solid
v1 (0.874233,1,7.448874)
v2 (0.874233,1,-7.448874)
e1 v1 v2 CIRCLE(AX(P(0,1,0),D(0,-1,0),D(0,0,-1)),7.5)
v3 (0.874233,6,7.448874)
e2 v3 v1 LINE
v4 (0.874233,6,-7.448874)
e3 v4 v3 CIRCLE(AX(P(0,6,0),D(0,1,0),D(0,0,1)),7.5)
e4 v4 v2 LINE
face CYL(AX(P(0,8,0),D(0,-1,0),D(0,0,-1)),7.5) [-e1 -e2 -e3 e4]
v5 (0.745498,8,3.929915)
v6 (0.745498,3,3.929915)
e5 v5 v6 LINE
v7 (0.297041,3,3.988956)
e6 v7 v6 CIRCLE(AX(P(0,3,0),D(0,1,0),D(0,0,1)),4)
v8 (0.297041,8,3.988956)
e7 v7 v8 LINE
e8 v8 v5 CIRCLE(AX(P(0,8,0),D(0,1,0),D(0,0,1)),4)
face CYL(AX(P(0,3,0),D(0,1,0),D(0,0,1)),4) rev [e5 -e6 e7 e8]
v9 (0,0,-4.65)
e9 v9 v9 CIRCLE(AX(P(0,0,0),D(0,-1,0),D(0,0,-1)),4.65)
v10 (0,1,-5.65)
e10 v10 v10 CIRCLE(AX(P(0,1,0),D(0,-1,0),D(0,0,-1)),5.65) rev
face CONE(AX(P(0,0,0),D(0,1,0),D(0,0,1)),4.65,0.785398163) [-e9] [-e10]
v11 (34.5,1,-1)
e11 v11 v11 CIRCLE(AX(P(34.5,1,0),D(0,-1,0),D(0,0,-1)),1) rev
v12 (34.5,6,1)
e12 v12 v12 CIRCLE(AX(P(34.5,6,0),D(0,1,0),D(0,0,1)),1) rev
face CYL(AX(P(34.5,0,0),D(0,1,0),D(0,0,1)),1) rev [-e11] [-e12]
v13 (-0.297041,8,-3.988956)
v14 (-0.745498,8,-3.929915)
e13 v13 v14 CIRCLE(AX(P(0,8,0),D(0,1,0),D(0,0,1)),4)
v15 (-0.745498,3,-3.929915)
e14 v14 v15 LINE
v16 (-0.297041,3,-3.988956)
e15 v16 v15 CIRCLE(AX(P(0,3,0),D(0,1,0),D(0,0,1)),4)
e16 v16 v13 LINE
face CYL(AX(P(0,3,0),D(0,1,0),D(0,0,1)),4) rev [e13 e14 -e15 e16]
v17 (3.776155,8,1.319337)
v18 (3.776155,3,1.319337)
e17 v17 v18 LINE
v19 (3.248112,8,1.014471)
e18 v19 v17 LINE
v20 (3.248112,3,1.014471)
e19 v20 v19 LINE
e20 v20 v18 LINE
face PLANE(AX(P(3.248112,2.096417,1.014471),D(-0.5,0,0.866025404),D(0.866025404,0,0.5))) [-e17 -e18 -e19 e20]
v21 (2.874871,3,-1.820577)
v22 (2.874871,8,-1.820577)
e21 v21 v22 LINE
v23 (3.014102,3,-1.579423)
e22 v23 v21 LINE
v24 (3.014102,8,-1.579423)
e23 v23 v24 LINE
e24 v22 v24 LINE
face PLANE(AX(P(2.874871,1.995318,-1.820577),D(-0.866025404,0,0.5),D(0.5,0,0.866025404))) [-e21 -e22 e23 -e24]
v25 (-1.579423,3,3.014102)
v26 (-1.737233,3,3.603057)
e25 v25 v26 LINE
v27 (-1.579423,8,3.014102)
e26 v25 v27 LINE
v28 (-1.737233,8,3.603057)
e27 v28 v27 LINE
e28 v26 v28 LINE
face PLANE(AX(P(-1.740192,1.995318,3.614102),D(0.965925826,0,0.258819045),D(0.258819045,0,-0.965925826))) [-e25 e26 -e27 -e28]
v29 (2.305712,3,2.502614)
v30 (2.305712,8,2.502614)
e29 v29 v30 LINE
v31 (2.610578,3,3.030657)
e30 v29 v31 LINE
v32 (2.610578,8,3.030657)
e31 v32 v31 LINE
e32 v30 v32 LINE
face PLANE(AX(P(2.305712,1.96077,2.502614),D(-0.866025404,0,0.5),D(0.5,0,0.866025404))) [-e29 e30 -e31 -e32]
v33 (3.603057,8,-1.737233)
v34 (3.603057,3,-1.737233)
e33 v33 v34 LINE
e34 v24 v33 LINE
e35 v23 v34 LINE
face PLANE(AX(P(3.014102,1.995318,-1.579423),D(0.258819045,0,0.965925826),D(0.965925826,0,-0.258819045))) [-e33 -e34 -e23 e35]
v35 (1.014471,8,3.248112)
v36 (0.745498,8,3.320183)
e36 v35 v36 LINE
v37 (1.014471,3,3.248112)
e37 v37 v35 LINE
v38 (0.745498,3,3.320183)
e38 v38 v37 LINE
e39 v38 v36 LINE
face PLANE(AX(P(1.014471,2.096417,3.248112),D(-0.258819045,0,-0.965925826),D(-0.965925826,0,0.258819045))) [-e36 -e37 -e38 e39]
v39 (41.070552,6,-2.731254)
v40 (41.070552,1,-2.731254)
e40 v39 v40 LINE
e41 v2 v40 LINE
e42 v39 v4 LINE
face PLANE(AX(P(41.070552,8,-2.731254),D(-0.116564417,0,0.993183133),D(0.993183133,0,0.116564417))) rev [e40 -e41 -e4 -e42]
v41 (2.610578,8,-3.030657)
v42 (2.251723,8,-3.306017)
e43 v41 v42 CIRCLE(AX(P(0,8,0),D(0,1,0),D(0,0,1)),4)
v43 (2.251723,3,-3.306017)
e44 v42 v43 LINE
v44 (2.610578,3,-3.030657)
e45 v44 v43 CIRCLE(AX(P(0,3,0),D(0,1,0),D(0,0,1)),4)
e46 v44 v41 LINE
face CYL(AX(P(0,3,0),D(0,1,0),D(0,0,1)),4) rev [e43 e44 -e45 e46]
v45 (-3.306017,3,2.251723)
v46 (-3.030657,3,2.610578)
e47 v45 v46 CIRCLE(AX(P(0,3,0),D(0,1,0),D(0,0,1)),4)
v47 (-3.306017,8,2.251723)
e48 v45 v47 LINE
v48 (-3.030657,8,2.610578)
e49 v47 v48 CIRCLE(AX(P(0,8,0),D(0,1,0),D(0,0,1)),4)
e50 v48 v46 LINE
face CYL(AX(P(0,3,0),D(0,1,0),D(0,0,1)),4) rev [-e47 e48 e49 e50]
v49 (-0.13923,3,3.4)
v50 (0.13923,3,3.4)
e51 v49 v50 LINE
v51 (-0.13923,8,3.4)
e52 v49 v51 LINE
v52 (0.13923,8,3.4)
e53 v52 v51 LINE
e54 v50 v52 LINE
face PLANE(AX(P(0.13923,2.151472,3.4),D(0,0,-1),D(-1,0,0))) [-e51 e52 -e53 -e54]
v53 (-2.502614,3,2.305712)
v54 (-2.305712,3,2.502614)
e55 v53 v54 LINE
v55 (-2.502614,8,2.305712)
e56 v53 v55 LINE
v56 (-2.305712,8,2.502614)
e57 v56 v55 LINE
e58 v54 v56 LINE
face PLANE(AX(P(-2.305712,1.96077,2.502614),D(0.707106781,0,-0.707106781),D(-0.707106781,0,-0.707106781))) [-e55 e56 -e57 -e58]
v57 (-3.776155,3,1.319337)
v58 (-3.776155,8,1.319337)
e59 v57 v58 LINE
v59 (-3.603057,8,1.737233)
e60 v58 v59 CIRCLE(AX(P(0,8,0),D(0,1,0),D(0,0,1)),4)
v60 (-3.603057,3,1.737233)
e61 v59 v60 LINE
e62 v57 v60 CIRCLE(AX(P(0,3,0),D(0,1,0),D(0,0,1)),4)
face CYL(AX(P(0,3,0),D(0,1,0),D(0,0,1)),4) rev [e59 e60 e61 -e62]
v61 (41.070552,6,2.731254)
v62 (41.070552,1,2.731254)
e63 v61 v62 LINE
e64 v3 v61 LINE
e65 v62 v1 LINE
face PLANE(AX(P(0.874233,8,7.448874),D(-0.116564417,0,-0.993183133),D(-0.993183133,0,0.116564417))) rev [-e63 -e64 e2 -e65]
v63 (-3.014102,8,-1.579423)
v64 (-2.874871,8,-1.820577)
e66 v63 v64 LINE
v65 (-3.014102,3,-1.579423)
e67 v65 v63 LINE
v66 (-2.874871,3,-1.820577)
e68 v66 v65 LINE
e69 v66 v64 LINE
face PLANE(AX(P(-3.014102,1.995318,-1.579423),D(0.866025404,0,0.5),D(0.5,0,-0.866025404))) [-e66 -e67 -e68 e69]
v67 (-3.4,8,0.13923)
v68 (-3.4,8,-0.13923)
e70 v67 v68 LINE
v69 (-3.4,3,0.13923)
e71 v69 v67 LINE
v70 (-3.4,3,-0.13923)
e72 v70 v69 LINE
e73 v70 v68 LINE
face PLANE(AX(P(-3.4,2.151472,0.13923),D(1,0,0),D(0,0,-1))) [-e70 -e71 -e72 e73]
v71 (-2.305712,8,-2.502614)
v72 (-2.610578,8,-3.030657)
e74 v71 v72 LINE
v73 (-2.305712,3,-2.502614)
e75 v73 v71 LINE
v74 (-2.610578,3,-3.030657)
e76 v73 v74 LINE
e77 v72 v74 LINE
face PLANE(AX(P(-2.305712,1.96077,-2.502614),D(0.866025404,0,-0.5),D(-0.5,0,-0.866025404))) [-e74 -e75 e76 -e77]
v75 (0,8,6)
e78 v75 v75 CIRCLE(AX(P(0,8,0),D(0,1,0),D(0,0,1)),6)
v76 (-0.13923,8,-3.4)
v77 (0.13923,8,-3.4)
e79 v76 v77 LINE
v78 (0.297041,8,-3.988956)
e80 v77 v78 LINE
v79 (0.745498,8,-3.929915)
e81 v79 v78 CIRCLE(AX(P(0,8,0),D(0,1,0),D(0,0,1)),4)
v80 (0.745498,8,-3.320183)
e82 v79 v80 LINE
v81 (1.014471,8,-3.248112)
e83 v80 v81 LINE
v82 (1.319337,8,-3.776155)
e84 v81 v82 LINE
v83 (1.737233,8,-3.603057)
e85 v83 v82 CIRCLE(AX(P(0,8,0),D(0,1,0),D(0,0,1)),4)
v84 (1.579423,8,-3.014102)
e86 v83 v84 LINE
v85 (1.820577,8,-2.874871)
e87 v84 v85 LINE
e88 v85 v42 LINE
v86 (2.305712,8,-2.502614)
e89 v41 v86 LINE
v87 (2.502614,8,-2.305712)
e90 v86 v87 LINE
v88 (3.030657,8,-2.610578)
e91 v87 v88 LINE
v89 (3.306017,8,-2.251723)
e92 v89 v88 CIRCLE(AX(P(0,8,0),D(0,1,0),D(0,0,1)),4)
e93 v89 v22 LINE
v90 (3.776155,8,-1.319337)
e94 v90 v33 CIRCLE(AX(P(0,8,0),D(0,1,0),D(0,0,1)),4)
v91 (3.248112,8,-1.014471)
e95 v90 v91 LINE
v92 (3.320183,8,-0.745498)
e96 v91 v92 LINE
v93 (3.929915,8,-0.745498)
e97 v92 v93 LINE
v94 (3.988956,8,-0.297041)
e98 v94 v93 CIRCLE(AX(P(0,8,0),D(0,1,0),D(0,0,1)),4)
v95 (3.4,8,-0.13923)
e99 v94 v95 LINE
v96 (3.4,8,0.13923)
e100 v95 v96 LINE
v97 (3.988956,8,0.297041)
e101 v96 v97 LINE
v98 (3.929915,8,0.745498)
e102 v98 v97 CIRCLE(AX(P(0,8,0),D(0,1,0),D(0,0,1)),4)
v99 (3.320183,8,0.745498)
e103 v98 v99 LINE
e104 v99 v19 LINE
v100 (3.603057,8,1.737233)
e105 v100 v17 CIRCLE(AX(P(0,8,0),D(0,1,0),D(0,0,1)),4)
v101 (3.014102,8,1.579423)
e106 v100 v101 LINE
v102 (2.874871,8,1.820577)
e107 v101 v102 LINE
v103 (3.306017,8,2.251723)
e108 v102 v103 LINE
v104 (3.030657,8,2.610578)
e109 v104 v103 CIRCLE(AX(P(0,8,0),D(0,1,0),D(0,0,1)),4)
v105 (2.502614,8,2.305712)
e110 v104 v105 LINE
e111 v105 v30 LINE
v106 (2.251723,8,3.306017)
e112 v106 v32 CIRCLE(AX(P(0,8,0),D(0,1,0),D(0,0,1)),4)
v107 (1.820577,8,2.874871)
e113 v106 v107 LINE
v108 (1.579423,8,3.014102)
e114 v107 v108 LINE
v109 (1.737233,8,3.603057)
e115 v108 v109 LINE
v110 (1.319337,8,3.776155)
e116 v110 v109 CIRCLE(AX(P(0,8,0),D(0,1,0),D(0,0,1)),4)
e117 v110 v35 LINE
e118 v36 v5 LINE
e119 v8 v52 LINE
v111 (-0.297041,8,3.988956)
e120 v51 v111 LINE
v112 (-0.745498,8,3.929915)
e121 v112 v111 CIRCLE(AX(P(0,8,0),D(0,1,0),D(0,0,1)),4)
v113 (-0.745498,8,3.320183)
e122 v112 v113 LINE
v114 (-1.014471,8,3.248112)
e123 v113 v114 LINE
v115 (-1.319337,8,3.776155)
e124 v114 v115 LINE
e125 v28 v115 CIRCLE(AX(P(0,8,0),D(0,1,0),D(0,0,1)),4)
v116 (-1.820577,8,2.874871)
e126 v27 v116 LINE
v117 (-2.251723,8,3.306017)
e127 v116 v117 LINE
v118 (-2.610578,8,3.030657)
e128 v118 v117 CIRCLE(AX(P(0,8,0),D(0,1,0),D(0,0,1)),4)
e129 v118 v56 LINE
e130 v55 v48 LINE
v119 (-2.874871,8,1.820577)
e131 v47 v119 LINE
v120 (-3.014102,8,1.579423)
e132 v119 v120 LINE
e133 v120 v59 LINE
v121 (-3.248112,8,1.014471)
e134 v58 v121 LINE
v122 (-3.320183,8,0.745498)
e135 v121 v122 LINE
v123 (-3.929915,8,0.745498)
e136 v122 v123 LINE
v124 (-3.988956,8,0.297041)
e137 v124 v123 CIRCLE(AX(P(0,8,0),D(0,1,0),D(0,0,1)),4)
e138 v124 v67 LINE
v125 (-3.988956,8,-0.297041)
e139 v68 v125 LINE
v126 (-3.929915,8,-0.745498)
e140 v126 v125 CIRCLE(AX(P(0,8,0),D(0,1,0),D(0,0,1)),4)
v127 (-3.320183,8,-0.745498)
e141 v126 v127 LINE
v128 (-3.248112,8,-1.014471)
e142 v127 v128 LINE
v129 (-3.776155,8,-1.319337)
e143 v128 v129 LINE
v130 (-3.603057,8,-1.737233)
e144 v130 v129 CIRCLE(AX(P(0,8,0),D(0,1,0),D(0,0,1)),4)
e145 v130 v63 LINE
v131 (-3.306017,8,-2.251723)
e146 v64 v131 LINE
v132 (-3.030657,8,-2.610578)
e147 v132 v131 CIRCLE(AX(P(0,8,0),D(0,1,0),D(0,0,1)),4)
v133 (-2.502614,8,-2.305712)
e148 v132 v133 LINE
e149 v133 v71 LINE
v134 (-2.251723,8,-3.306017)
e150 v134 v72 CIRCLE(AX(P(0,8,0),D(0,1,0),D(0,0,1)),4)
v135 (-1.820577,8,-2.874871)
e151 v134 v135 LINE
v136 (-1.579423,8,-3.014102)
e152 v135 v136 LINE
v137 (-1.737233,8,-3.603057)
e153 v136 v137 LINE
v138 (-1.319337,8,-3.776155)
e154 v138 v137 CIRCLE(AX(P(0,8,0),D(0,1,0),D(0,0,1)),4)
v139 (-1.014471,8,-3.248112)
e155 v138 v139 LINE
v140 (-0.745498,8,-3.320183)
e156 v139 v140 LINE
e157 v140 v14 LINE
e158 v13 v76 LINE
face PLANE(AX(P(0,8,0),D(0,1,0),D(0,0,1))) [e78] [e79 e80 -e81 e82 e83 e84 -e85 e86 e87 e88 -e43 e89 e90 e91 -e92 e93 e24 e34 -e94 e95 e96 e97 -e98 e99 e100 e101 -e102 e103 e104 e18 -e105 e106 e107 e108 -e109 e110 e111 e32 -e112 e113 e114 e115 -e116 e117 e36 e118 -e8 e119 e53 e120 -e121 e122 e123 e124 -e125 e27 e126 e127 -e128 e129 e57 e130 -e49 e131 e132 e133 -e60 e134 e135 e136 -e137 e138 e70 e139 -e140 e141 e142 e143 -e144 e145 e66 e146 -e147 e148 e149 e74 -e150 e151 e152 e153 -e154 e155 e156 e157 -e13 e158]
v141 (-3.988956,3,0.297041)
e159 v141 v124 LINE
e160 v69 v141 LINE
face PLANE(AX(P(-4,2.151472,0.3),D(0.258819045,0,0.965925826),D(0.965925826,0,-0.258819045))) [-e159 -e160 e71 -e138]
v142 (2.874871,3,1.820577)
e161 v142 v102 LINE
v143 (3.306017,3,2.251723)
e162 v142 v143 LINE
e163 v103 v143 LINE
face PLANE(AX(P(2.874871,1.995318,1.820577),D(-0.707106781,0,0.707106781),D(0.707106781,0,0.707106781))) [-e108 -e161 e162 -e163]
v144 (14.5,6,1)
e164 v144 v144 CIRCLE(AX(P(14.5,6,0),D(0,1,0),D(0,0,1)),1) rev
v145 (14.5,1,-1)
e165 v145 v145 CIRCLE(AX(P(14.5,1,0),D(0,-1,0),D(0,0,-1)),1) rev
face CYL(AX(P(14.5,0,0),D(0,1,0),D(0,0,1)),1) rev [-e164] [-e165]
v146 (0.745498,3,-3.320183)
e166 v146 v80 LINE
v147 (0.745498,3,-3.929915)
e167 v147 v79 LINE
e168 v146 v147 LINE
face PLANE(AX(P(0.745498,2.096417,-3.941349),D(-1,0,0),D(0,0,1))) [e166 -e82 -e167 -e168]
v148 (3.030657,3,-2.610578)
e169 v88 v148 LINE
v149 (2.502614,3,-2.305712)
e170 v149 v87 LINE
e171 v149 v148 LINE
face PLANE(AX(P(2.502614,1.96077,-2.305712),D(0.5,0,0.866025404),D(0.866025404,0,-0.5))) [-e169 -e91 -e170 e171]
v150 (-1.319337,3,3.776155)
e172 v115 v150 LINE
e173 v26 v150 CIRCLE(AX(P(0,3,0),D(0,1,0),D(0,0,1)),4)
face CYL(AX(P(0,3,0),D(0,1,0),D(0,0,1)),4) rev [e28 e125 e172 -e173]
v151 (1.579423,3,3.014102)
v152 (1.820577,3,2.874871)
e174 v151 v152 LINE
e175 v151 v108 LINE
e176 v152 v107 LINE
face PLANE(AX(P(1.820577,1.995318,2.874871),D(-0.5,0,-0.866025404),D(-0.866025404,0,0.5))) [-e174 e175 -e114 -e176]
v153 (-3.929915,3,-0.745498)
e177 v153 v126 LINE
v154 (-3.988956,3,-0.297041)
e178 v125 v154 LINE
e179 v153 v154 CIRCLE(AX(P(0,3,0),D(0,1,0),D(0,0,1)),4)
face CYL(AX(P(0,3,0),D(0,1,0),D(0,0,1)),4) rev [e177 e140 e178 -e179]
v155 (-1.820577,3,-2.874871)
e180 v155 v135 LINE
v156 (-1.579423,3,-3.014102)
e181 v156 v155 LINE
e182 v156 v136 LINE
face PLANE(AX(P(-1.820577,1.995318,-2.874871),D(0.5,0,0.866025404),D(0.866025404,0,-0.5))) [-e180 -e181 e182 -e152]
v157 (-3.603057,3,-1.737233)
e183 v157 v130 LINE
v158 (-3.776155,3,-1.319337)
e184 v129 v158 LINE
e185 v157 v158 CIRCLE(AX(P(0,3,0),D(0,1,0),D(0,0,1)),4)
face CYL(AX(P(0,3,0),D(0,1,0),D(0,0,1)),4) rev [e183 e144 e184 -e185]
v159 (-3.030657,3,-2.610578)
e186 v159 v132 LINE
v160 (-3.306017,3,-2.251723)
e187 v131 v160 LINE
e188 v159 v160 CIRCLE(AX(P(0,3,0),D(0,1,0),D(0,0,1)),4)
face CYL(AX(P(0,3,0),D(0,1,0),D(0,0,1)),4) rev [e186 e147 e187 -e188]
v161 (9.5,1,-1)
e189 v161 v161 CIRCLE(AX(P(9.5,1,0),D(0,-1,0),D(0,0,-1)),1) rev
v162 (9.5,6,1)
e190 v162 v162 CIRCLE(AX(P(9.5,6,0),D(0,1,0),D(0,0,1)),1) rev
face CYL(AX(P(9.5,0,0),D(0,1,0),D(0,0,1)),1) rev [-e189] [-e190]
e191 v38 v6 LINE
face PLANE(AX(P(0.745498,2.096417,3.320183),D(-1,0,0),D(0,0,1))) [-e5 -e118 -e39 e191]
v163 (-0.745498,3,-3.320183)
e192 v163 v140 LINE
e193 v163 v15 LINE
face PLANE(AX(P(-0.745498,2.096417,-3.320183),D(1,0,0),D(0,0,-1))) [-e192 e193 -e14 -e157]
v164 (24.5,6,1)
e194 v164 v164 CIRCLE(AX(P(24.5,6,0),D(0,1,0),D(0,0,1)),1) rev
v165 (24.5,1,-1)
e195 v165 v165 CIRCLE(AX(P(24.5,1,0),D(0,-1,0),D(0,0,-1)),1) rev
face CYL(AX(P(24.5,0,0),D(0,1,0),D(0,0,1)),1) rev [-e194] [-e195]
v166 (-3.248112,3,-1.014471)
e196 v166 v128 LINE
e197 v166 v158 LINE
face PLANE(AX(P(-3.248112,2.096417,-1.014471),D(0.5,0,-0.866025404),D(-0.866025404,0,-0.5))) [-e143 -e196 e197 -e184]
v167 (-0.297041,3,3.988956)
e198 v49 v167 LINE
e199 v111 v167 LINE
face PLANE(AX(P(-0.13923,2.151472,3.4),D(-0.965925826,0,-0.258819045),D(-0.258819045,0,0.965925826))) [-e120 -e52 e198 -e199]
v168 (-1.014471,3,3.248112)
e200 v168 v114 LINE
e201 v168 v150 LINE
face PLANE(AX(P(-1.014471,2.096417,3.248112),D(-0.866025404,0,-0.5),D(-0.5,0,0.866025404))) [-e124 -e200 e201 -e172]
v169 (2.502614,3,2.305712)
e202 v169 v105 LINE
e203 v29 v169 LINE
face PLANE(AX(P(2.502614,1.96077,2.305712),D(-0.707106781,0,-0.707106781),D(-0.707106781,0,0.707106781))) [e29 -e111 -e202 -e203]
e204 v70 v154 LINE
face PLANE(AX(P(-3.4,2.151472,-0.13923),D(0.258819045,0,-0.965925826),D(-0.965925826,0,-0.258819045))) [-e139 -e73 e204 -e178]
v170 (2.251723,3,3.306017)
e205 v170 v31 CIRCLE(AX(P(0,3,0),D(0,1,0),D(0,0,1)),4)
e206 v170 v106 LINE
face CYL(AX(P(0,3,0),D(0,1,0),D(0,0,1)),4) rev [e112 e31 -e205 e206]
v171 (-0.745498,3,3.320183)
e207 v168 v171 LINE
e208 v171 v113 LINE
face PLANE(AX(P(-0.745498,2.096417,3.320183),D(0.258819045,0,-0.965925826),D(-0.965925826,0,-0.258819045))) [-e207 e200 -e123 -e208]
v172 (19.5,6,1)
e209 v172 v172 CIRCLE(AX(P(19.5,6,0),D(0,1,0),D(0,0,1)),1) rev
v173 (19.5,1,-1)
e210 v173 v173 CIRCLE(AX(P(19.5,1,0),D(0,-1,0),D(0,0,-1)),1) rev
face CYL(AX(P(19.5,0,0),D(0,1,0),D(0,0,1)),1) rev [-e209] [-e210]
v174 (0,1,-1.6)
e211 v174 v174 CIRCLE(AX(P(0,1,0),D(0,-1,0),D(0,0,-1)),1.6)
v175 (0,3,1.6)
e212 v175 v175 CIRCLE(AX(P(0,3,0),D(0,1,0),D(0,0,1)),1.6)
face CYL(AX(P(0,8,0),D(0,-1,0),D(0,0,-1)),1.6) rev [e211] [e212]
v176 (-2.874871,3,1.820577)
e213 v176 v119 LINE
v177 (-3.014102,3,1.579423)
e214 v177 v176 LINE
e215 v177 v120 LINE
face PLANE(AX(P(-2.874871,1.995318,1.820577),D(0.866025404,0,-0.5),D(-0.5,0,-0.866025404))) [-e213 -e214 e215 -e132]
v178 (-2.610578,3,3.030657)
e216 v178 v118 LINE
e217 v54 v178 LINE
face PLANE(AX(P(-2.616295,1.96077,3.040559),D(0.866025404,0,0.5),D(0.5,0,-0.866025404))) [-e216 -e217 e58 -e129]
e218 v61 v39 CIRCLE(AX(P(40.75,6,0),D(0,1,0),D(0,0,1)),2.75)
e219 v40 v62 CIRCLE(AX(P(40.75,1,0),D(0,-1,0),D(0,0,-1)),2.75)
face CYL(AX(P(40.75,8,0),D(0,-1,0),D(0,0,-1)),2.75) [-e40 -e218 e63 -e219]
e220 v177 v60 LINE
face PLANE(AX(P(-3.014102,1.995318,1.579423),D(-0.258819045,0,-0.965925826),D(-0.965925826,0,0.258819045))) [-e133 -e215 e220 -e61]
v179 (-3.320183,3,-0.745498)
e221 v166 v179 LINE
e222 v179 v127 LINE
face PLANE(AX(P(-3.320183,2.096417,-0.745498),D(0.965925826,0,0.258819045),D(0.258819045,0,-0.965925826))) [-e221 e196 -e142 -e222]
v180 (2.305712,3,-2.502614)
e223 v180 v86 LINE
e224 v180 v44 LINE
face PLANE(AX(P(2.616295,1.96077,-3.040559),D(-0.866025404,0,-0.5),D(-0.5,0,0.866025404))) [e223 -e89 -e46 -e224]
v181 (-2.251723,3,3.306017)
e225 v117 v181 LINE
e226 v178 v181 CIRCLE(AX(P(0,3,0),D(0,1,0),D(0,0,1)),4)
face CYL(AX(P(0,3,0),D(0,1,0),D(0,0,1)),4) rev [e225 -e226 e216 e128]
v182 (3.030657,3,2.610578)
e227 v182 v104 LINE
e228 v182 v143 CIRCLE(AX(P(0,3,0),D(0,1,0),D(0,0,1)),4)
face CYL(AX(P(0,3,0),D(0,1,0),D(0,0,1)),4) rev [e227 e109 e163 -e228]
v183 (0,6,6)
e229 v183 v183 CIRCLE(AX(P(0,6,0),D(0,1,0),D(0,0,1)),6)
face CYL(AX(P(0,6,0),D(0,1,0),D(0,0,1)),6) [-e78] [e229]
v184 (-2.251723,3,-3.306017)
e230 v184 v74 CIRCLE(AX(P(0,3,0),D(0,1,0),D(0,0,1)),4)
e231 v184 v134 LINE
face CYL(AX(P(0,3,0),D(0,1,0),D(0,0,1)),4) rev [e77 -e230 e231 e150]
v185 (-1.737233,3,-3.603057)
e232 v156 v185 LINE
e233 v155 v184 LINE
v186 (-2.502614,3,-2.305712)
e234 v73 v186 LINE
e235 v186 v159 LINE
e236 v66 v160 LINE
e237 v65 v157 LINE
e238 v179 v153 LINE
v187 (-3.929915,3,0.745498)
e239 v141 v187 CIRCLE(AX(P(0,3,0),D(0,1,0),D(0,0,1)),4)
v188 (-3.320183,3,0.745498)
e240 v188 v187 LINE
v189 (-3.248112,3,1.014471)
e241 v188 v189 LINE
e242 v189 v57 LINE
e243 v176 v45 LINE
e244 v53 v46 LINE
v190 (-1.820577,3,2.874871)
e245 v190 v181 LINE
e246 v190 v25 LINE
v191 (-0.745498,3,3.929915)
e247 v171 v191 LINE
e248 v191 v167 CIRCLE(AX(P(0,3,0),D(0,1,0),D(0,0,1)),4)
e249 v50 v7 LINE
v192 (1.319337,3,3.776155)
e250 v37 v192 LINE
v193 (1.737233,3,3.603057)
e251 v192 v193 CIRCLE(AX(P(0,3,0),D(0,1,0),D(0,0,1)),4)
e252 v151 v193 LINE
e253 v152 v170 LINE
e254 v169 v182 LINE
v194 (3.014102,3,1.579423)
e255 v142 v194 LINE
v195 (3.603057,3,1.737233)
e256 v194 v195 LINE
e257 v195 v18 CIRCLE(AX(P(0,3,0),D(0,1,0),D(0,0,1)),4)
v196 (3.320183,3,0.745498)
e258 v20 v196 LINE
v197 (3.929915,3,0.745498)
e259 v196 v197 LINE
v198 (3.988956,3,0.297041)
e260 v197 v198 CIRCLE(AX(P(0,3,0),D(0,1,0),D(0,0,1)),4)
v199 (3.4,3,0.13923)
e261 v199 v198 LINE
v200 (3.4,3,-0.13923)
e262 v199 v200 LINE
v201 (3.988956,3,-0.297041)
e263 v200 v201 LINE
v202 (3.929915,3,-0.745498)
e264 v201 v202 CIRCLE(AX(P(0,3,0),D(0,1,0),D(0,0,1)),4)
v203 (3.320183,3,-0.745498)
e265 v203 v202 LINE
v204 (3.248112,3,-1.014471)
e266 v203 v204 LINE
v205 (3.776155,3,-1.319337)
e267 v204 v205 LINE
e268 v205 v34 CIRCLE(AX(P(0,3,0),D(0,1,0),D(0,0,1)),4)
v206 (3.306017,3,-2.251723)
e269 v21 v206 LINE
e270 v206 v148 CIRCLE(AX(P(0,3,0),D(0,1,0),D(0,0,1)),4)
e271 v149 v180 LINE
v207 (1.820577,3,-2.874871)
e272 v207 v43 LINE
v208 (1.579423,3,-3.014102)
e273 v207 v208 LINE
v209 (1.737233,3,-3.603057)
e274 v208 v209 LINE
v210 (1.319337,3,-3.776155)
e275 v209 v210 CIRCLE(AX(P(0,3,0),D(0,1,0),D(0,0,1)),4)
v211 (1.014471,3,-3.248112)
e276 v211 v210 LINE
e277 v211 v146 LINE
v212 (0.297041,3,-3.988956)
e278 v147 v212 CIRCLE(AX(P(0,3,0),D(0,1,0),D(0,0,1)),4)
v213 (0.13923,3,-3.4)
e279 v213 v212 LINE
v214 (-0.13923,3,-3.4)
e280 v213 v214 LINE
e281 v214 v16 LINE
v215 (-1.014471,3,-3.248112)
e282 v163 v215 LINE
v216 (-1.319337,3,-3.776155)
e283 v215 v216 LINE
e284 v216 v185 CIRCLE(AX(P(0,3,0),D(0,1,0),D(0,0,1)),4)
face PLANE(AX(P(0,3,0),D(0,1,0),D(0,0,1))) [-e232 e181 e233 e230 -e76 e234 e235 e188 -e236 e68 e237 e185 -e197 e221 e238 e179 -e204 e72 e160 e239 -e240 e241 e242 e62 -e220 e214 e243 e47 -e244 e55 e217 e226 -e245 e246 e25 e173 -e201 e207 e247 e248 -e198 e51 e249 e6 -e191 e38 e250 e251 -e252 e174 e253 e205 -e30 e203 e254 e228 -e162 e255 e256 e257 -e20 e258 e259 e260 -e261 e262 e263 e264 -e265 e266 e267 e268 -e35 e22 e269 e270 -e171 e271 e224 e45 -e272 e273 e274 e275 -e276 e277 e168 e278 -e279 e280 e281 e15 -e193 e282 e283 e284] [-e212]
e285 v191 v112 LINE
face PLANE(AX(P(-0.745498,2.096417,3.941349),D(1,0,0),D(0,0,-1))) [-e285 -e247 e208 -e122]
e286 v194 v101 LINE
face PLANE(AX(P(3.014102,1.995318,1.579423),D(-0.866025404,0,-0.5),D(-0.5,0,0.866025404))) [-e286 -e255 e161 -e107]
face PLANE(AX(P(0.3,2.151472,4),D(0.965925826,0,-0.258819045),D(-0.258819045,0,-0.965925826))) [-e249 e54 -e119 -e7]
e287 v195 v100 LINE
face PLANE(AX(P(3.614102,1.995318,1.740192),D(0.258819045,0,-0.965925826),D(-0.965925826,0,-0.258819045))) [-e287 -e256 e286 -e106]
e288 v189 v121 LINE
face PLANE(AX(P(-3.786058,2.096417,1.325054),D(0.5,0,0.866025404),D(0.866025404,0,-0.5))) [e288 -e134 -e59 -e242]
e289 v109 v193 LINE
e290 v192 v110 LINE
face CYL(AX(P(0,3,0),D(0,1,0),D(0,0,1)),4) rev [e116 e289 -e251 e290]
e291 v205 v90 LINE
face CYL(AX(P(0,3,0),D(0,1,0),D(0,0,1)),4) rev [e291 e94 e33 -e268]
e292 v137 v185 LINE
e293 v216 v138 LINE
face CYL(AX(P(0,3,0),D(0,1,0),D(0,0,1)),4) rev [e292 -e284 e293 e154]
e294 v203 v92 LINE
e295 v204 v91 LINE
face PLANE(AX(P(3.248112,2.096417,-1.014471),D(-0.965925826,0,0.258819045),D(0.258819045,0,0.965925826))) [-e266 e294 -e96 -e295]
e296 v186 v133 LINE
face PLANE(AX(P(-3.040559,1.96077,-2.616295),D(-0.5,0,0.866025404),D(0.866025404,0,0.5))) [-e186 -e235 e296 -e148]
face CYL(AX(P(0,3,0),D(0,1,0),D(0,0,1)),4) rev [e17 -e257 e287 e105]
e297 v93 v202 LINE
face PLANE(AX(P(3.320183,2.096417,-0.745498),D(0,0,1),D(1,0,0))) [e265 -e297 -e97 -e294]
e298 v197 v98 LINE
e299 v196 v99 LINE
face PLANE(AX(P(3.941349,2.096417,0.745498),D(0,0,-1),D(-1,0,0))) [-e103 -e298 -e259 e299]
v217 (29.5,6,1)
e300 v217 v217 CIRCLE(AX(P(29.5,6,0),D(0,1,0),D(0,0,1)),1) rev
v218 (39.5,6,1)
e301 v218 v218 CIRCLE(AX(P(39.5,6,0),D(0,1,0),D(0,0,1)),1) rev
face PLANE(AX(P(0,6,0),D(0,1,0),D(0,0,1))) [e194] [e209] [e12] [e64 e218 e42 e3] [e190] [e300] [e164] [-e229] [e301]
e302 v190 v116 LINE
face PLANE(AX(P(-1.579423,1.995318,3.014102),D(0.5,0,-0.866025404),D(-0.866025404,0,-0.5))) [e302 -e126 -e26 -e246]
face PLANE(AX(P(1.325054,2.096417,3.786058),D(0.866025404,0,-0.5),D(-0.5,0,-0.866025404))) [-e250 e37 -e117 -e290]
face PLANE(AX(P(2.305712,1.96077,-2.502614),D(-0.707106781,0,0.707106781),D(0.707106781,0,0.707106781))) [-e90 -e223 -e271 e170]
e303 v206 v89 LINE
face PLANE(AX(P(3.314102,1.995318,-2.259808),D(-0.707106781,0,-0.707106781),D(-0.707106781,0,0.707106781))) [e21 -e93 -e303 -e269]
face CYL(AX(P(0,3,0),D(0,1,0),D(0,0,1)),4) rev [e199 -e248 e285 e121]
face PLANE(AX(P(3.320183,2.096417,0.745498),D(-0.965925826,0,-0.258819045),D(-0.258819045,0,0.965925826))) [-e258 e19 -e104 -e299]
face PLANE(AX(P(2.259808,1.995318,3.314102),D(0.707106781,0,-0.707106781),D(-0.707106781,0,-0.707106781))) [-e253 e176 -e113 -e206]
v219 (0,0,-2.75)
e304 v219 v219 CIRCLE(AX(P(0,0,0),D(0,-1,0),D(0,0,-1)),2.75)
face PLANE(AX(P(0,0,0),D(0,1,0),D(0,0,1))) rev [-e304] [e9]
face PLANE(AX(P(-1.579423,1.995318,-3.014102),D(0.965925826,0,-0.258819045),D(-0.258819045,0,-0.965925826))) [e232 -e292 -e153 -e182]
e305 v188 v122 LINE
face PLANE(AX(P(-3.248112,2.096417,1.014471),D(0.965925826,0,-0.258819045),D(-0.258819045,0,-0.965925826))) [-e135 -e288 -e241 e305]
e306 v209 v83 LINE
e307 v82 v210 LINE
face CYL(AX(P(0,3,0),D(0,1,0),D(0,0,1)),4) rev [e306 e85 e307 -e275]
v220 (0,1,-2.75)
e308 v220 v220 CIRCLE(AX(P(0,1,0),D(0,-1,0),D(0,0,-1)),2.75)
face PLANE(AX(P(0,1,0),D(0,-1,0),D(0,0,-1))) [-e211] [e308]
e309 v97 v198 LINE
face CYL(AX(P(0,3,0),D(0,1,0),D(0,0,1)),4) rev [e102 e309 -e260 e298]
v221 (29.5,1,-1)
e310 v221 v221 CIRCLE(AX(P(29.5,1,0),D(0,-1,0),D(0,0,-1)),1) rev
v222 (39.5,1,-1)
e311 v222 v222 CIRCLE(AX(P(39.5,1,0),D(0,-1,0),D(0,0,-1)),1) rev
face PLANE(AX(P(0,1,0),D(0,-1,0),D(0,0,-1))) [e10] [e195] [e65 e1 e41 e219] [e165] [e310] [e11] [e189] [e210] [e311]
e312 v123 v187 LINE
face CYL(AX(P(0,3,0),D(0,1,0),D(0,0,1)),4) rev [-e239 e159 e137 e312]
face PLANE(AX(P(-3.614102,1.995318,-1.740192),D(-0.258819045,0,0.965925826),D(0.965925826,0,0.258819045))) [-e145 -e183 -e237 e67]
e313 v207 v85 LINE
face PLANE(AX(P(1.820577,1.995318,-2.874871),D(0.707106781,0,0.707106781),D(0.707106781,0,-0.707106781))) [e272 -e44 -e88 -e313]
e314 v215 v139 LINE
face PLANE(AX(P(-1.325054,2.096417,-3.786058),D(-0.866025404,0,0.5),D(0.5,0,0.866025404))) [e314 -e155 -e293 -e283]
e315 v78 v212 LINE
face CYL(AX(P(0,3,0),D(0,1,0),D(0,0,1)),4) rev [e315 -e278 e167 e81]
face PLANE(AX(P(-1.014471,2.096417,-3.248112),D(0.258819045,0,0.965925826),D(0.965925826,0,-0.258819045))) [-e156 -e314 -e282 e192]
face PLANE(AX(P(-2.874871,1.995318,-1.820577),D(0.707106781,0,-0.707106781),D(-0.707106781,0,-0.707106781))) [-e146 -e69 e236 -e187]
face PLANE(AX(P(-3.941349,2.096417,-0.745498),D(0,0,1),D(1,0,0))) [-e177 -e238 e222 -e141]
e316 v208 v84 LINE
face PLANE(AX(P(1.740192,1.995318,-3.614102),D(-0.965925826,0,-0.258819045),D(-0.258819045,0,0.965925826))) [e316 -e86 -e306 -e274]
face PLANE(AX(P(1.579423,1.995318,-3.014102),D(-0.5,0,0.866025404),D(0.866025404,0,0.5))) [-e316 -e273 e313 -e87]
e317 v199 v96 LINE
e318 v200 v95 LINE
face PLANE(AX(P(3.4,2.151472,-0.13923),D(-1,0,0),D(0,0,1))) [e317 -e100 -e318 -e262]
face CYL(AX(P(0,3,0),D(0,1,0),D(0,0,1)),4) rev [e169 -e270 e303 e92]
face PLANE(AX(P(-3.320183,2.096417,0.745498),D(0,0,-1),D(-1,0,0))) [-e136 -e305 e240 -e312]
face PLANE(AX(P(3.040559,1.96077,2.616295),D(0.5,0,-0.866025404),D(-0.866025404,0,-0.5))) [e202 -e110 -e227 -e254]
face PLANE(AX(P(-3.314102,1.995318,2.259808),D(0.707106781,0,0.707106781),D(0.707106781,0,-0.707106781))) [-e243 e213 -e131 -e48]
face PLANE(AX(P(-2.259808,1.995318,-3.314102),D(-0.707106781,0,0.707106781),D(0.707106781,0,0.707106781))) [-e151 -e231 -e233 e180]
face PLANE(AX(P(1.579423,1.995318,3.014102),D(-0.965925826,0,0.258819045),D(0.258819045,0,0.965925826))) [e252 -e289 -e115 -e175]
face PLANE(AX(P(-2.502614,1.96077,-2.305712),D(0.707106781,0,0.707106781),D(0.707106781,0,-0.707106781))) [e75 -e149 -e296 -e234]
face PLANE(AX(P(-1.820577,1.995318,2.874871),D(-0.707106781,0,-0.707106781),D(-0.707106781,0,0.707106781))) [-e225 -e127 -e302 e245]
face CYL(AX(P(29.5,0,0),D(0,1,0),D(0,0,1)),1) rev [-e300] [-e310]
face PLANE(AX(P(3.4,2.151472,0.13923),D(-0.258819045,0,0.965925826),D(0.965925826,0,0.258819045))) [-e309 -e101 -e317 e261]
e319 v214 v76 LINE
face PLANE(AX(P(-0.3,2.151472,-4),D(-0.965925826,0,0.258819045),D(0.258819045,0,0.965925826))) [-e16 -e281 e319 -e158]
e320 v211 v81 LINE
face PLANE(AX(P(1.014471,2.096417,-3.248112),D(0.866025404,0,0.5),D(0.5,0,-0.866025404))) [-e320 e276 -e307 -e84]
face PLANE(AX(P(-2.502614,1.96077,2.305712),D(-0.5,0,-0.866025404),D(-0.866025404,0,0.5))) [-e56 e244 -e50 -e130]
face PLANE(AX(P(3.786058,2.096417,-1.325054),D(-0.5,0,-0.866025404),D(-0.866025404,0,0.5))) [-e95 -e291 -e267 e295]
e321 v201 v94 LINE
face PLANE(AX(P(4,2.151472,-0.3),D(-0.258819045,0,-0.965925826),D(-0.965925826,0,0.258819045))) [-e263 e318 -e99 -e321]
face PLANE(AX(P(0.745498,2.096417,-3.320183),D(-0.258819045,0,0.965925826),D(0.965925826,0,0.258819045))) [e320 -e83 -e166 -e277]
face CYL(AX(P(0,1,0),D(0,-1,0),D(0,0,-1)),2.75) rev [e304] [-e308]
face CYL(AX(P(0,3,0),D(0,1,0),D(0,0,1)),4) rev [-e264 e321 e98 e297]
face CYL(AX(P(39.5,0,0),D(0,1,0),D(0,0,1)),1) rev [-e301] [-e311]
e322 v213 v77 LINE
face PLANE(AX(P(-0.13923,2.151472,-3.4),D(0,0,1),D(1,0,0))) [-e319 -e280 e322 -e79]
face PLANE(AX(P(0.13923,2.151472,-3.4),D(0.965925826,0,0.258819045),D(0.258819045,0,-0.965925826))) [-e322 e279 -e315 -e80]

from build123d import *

# Parameters (mm, degrees)
ESQUISSE1_R                  = 1.6
BOSS_EXTRU_1_DEPTH           = 8
ESQUISSE2_R                  = 1
ENL_V_MAT_EXTRU_1_DEPTH      = 8
R_P_TITION_LIN_AIRE1_COUNT   = 7
R_P_TITION_LIN_AIRE1_PITCH   = 5
ESQUISSE3_W                  = 63.02569825
ESQUISSE3_H                  = 22.447508966
ESQUISSE3_R                  = 6
ENL_V_MAT_EXTRU_2_DEPTH      = 2
ESQUISSE4_W                  = 65.150237544
ESQUISSE4_H                  = 23.585889013
ESQUISSE4_R                  = 4.65
ENL_V_MAT_EXTRU_3_DEPTH      = 1
ESQUISSE5_R                  = 2.75
ENL_V_MAT_EXTRU_4_DEPTH      = 1
CHANFREIN1_SIZE              = 1
ESQUISSE6_R                  = 4
ENL_V_MAT_EXTRU_5_DEPTH      = 5
BOSS_EXTRU_2_DEPTH           = 5
R_P_TITION_CIRCULAIRE1_COUNT = 24


with BuildPart() as part:
    # Esquisse1 → Boss.-Extru.1 (new body)
    with BuildSketch(Plane(origin=(0, 0, 0), x_dir=(1, 0, 0), z_dir=(0, 1, 0))):
        with BuildLine():
            Line((0.874233129, -7.448873501), (41.070552147, -2.731253617))
            ThreePointArc((41.070552147, -2.731253617), (43.5, 0), (41.070552147, 2.731253617))
            Line((41.070552147, 2.731253617), (0.874233129, 7.448873501))
            ThreePointArc((0.874233129, 7.448873501), (-7.5, 0), (0.874233129, -7.448873501))
        make_face()
        with Locations(Location((0, 0, 0), (0, 0, 270))):
            Circle(ESQUISSE1_R, mode=Mode.SUBTRACT)
    extrude(amount=BOSS_EXTRU_1_DEPTH)

    # Esquisse2 → Enlèv. mat.-Extru.1 (cut)
    with BuildSketch(Plane(origin=(0, 8, 0), x_dir=(1, 0, 0), z_dir=(0, 1, 0))):
        with Locations(Location((9.5, 0, 0), (0, 0, 270))):
            Circle(ESQUISSE2_R)
    enl_v_mat_extru_1 = extrude(amount=-ENL_V_MAT_EXTRU_1_DEPTH, mode=Mode.SUBTRACT)

    # Répétition linéaire1: Enlèv. mat.-Extru.1 ×7
    with Locations(*[(i * R_P_TITION_LIN_AIRE1_PITCH, 0, 0) for i in range(1, R_P_TITION_LIN_AIRE1_COUNT)]):
        add(enl_v_mat_extru_1, mode=Mode.SUBTRACT)

    # Esquisse3 → Enlèv. mat.-Extru.2 (cut)
    with BuildSketch(Plane(origin=(0, 8, 0), x_dir=(1, 0, 0), z_dir=(0, 1, 0))):
        with Locations((18.729808022, -1.006570064)):
            Rectangle(ESQUISSE3_W, ESQUISSE3_H)
        with Locations(Location((0, 0, 0), (0, 0, 270))):
            Circle(ESQUISSE3_R, mode=Mode.SUBTRACT)
    extrude(amount=-ENL_V_MAT_EXTRU_2_DEPTH, mode=Mode.SUBTRACT)

    # Esquisse4 → Enlèv. mat.-Extru.3 (cut)
    with BuildSketch(Plane.XZ):
        with Locations((19.098187779, 0.565848797)):
            Rectangle(ESQUISSE4_W, ESQUISSE4_H)
        with Locations(Location((0, 0, 0), (0, 0, 270))):
            Circle(ESQUISSE4_R, mode=Mode.SUBTRACT)
    extrude(amount=-ENL_V_MAT_EXTRU_3_DEPTH, mode=Mode.SUBTRACT)

    # Esquisse5 → Enlèv. mat.-Extru.4 (cut)
    with BuildSketch(Plane.XZ):
        with Locations(Location((0, 0, 0), (0, 0, 270))):
            Circle(ESQUISSE5_R)
    extrude(amount=-ENL_V_MAT_EXTRU_4_DEPTH, mode=Mode.SUBTRACT)

    # Chanfrein1
    chanfrein1_edges = [part.edges().sort_by_distance(p)[0] for p in [
        (0, 1, 4.65),
    ]]
    chamfer(chanfrein1_edges, length=CHANFREIN1_SIZE - 0.0001)  # a hair under: the kernel refuses the full size

    # Esquisse6 → Enlèv. mat.-Extru.5 (cut)
    with BuildSketch(Plane(origin=(0, 8, 0), x_dir=(1, 0, 0), z_dir=(0, 1, 0))):
        with Locations(Location((0, 0, 0), (0, 0, 270))):
            Circle(ESQUISSE6_R)
    extrude(amount=-ENL_V_MAT_EXTRU_5_DEPTH, mode=Mode.SUBTRACT)

    # Esquisse7 → Boss.-Extru.2 (add)
    with BuildSketch(Plane(origin=(0, 8, 0), x_dir=(1, 0, 0), z_dir=(0, 1, 0))):
        Polygon((0.3, -4), (0.139230485, -3.4), (-0.139230485, -3.4), (-0.3, -4), align=None)
    boss_extru_2 = extrude(amount=-BOSS_EXTRU_2_DEPTH)

    # Répétition circulaire1: Boss.-Extru.2 ×24 about axis
    r_p_tition_circulaire1_axis = Axis((0, 0, 0), (0, 1, 0))
    for i in range(1, R_P_TITION_CIRCULAIRE1_COUNT):
        add(boss_extru_2.rotate(r_p_tition_circulaire1_axis, i * 360 / R_P_TITION_CIRCULAIRE1_COUNT))


solid = part.part
